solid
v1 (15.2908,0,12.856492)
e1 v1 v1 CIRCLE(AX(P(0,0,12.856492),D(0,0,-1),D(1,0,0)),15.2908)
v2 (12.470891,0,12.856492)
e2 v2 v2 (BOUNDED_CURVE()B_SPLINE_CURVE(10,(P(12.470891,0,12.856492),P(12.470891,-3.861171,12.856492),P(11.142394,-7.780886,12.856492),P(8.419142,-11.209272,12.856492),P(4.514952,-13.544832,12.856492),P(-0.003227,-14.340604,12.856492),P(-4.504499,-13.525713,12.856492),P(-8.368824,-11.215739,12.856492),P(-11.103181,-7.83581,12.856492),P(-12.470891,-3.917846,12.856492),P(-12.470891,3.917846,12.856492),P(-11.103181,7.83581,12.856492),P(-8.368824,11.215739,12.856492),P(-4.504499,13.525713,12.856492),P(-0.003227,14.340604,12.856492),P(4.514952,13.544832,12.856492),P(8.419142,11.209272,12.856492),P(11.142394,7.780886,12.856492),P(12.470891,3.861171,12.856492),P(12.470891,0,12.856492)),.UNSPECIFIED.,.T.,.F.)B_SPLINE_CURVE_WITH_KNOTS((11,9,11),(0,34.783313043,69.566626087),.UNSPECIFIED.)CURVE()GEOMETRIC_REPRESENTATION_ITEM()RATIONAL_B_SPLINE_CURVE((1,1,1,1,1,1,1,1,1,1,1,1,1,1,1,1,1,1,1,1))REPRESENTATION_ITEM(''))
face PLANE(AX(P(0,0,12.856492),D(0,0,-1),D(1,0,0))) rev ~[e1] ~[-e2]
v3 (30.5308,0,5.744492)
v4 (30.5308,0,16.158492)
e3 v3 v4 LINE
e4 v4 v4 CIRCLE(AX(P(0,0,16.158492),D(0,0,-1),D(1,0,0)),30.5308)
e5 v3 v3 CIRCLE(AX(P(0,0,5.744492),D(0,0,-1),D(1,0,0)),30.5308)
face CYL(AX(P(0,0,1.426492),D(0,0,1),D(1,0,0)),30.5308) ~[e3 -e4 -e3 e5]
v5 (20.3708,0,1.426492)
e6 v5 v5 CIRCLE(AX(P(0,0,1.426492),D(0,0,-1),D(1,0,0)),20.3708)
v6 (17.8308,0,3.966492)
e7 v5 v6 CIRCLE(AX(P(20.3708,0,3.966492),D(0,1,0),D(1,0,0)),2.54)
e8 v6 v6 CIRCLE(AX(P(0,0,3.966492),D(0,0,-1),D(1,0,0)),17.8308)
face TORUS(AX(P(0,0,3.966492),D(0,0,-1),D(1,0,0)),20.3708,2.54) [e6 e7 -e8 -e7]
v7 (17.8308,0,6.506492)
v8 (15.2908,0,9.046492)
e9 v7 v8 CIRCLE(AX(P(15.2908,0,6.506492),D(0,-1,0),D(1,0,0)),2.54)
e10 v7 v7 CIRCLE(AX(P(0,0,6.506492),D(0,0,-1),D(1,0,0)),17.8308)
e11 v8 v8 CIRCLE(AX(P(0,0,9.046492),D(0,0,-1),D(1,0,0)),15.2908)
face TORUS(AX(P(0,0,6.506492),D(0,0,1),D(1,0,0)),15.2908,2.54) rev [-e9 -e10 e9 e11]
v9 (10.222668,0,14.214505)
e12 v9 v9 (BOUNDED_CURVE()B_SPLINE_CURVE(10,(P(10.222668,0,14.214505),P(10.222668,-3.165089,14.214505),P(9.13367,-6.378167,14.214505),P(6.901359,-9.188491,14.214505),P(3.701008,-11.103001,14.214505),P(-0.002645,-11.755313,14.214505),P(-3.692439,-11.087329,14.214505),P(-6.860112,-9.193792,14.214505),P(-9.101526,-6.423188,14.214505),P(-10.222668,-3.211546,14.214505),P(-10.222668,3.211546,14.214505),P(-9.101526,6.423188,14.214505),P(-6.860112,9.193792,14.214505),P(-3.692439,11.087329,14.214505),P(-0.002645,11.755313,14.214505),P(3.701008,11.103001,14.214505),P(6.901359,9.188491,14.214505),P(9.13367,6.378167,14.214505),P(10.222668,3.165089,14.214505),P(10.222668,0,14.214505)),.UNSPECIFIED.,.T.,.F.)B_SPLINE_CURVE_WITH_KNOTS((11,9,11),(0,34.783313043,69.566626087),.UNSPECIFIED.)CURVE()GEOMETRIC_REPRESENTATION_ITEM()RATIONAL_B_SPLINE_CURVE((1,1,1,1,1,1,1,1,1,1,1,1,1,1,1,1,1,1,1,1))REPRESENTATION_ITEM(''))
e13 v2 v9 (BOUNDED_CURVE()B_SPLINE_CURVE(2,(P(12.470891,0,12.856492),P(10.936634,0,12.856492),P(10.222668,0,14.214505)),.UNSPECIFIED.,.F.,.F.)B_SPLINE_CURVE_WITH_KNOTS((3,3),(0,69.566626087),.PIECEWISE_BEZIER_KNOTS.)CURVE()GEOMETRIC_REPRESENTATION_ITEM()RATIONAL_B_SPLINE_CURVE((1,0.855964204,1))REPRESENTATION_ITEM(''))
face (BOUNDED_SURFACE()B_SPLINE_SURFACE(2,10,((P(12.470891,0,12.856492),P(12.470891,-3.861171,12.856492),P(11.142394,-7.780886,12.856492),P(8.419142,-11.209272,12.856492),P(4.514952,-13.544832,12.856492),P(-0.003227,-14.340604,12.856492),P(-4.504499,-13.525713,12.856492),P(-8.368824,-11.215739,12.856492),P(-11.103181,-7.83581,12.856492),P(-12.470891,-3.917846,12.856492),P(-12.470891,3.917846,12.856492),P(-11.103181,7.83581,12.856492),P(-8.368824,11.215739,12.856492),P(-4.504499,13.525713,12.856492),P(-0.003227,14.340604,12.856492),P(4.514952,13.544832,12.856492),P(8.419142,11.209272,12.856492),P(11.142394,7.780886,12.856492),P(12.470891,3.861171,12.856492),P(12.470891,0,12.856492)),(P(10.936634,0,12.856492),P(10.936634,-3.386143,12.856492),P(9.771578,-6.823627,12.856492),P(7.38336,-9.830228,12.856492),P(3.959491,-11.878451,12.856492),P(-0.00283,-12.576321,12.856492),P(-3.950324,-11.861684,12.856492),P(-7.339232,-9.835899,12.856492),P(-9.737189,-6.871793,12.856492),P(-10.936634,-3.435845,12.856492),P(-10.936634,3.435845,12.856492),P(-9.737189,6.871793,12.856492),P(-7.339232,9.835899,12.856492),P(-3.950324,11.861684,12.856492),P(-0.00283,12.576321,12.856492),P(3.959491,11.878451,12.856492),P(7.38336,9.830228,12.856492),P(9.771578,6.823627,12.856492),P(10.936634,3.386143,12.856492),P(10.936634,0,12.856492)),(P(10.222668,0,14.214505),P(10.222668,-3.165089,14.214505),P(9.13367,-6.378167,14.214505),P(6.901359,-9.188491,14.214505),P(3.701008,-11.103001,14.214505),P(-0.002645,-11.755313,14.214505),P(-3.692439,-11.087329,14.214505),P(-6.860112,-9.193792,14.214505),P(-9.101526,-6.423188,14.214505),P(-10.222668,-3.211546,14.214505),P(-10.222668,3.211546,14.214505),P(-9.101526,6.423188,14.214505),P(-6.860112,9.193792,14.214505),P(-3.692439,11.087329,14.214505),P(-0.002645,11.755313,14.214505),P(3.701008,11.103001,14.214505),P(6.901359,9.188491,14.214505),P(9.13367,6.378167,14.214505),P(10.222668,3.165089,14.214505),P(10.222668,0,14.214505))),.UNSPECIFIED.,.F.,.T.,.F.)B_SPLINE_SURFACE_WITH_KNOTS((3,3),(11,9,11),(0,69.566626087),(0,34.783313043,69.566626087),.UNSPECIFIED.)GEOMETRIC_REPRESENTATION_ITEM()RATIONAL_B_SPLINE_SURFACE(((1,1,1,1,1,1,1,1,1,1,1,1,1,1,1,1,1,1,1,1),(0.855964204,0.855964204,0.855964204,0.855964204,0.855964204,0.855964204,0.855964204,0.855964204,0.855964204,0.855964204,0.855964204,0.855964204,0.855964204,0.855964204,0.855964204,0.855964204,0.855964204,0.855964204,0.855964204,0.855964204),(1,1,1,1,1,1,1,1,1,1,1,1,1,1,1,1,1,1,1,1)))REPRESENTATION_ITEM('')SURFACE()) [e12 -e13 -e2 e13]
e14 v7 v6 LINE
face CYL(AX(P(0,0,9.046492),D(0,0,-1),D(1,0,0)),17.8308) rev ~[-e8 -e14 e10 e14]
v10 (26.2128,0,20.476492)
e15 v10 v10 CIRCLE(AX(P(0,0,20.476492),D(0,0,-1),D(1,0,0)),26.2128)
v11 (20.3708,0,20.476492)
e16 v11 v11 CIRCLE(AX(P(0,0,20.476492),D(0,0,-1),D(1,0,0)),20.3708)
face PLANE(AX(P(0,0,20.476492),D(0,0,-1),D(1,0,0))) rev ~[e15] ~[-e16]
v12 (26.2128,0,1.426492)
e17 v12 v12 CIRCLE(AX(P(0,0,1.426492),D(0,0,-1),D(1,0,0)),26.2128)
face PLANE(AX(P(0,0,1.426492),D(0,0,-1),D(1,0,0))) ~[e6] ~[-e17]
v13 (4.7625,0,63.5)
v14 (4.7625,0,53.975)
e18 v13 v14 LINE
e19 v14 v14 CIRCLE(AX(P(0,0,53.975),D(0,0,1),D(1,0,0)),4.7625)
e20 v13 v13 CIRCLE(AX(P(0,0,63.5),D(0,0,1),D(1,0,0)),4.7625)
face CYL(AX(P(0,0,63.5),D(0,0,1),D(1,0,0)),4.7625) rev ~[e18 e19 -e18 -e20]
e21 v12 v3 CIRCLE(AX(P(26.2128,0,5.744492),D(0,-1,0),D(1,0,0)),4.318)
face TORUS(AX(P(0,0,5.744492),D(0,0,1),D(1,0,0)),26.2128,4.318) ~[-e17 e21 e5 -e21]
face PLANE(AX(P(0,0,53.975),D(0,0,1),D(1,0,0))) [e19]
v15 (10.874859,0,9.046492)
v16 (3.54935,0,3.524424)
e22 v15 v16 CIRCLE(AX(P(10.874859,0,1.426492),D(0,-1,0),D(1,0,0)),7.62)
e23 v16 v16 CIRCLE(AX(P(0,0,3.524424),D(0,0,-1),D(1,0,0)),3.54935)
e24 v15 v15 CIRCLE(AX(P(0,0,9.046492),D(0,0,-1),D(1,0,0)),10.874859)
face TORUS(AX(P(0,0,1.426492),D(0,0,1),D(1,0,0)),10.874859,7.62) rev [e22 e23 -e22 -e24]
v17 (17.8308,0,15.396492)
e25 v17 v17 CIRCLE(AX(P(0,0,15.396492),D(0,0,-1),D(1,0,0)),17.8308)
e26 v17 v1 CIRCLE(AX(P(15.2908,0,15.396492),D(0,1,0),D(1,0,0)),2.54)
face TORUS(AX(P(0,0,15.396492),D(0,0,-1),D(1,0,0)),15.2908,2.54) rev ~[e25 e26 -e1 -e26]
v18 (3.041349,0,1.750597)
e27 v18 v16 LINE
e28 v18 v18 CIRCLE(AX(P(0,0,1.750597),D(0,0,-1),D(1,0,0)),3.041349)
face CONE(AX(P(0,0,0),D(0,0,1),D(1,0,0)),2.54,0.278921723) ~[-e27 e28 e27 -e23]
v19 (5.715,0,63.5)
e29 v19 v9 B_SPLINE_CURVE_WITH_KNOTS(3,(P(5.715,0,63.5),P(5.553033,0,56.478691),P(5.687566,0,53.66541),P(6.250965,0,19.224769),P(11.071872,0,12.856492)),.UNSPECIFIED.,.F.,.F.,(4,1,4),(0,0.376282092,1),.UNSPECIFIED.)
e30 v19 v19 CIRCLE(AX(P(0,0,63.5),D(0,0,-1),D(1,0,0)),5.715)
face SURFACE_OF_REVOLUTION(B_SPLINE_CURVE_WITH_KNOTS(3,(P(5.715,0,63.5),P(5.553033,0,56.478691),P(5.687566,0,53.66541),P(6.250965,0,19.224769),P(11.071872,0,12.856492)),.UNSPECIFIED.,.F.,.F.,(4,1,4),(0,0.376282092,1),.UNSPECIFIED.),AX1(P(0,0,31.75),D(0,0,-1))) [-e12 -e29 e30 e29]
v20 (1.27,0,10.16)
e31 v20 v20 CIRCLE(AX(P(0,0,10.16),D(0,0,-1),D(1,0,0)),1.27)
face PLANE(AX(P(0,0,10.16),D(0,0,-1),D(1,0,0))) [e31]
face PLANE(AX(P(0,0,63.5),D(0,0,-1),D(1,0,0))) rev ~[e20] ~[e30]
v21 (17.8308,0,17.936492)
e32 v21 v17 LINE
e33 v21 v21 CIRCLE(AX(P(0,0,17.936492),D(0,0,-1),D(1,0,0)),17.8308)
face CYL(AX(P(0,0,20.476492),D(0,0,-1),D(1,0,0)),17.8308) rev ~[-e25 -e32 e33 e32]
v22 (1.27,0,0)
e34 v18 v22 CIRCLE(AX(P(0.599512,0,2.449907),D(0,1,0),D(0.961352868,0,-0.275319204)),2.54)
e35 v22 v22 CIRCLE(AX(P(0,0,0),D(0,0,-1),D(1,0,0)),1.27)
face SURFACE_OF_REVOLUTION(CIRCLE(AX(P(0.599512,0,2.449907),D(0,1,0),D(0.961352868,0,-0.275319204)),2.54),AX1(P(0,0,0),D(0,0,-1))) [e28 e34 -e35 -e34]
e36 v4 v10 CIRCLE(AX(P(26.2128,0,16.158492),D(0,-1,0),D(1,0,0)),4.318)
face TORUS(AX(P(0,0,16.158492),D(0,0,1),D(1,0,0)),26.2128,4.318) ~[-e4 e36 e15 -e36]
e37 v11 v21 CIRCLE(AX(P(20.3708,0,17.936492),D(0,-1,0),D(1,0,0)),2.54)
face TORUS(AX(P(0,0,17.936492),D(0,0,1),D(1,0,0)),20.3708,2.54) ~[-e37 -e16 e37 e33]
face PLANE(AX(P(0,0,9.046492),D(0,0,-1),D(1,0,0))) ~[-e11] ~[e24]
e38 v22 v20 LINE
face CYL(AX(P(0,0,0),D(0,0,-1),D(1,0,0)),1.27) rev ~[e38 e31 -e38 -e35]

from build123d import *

# Parameters (mm, degrees)
F2_R     = 4.7625
F4_DEPTH = 9.525
F5_R     = 1.27
F6_DEPTH = 10.16
F8_R     = 7.62
F9_R     = 4.318
F10_R    = 2.54
F11_R    = 2.54


# Not quite as in the source:
# - a fillet or chamfer that OpenCascade refuses, or shapes differently, is made with other operations: its cross-section is extruded or revolved along the edge and cut away or added


with BuildPart() as f1:
    # F0 (on Front) → F1 (revolve)
    with BuildSketch(Plane.XZ):
        with BuildLine():
            Line((30.5308, 1.4264921218), (30.5308, 20.4764921218))
            Line((30.5308, 20.4764921218), (17.8308, 20.4764921218))
            Line((17.8308, 20.4764921218), (17.8308, 12.8564921218))
            Line((17.8308, 12.8564921218), (11.0718724159, 12.8564921218))
            add(Edge.make_bspline(
                [(5.715, 63.5), (5.5530331762, 56.4786912002), (5.6875657666, 53.6654097305), (6.2509646676, 19.2247689696), (11.0718724159, 12.8564921218)],
                knots=[0, 0, 0, 0, 0.3762820924, 1, 1, 1, 1], degree=3))
            Line((5.715, 63.5), (0, 63.5))
            Line((0, 63.5), (0, 0))
            Line((0, 0), (2.54, 0))
            Line((2.54, 0), (5.1308, 9.0464921218))
            Line((5.1308, 9.0464921218), (17.8308, 9.0464921218))
            Line((17.8308, 9.0464921218), (17.8308, 1.4264921218))
            Line((17.8308, 1.4264921218), (30.5308, 1.4264921218))
        make_face()
    revolve(axis=Axis((0, 0, 31.75), (0, 0, -1)))

    # F2 (on face) → F4 (cut)
    with BuildSketch(Plane.XY.offset(63.5)):
        Circle(F2_R)
    extrude(amount=-F4_DEPTH, mode=Mode.SUBTRACT)

    # F5 (on face) → F6 (cut)
    with BuildSketch(Plane(origin=(0, 0, 0), x_dir=(1, 0, 0), z_dir=(0, 0, -1))):
        Circle(F5_R)
    extrude(amount=-F6_DEPTH, mode=Mode.SUBTRACT)

    # F7: fillet of radius 2.54 on 1 edges, made by hand

    # F7_s1 → F7_t2 (revolve, cut)
    with BuildSketch(Plane.XZ):
        with BuildLine():
            ThreePointArc((3.0413485481, 1.7505966073), (2.3849498356, 0.6433048613), (1.27, 0))
            Line((1.27, 0), (2.54, 0))
            Line((2.54, 0), (3.0413485481, 1.7505966073))
        make_face()
    revolve(axis=Axis((0, 0, 0), (0, 0, -1)), mode=Mode.SUBTRACT)

    # F8
    f8_edges = [f1.edges().sort_by_distance(p)[0] for p in [
        (-5.1308, 0, 9.046492),
    ]]
    fillet(f8_edges, radius=F8_R)

    # F9
    f9_edges = [f1.edges().sort_by_distance(p)[0] for p in [
        (-30.5308, 0, 1.426492),
        (-30.5308, 0, 20.476492),
        (30.5308, 0, 10.951492),
    ]]
    fillet(f9_edges, radius=F9_R)

    # F10
    f10_edges = [f1.edges().sort_by_distance(p)[0] for p in [
        (-11.071872, 0, 12.856492),
        (-17.8308, 0, 12.856492),
        (-17.8308, 0, 20.476492),
        (17.8308, 0, 16.666492),
    ]]
    fillet(f10_edges, radius=F10_R)

    # F11
    f11_edges = [f1.edges().sort_by_distance(p)[0] for p in [
        (-17.8308, 0, 9.046492),
        (-17.8308, 0, 1.426492),
        (17.8308, 0, 5.236492),
    ]]
    fillet(f11_edges, radius=F11_R)


solid = f1.part
